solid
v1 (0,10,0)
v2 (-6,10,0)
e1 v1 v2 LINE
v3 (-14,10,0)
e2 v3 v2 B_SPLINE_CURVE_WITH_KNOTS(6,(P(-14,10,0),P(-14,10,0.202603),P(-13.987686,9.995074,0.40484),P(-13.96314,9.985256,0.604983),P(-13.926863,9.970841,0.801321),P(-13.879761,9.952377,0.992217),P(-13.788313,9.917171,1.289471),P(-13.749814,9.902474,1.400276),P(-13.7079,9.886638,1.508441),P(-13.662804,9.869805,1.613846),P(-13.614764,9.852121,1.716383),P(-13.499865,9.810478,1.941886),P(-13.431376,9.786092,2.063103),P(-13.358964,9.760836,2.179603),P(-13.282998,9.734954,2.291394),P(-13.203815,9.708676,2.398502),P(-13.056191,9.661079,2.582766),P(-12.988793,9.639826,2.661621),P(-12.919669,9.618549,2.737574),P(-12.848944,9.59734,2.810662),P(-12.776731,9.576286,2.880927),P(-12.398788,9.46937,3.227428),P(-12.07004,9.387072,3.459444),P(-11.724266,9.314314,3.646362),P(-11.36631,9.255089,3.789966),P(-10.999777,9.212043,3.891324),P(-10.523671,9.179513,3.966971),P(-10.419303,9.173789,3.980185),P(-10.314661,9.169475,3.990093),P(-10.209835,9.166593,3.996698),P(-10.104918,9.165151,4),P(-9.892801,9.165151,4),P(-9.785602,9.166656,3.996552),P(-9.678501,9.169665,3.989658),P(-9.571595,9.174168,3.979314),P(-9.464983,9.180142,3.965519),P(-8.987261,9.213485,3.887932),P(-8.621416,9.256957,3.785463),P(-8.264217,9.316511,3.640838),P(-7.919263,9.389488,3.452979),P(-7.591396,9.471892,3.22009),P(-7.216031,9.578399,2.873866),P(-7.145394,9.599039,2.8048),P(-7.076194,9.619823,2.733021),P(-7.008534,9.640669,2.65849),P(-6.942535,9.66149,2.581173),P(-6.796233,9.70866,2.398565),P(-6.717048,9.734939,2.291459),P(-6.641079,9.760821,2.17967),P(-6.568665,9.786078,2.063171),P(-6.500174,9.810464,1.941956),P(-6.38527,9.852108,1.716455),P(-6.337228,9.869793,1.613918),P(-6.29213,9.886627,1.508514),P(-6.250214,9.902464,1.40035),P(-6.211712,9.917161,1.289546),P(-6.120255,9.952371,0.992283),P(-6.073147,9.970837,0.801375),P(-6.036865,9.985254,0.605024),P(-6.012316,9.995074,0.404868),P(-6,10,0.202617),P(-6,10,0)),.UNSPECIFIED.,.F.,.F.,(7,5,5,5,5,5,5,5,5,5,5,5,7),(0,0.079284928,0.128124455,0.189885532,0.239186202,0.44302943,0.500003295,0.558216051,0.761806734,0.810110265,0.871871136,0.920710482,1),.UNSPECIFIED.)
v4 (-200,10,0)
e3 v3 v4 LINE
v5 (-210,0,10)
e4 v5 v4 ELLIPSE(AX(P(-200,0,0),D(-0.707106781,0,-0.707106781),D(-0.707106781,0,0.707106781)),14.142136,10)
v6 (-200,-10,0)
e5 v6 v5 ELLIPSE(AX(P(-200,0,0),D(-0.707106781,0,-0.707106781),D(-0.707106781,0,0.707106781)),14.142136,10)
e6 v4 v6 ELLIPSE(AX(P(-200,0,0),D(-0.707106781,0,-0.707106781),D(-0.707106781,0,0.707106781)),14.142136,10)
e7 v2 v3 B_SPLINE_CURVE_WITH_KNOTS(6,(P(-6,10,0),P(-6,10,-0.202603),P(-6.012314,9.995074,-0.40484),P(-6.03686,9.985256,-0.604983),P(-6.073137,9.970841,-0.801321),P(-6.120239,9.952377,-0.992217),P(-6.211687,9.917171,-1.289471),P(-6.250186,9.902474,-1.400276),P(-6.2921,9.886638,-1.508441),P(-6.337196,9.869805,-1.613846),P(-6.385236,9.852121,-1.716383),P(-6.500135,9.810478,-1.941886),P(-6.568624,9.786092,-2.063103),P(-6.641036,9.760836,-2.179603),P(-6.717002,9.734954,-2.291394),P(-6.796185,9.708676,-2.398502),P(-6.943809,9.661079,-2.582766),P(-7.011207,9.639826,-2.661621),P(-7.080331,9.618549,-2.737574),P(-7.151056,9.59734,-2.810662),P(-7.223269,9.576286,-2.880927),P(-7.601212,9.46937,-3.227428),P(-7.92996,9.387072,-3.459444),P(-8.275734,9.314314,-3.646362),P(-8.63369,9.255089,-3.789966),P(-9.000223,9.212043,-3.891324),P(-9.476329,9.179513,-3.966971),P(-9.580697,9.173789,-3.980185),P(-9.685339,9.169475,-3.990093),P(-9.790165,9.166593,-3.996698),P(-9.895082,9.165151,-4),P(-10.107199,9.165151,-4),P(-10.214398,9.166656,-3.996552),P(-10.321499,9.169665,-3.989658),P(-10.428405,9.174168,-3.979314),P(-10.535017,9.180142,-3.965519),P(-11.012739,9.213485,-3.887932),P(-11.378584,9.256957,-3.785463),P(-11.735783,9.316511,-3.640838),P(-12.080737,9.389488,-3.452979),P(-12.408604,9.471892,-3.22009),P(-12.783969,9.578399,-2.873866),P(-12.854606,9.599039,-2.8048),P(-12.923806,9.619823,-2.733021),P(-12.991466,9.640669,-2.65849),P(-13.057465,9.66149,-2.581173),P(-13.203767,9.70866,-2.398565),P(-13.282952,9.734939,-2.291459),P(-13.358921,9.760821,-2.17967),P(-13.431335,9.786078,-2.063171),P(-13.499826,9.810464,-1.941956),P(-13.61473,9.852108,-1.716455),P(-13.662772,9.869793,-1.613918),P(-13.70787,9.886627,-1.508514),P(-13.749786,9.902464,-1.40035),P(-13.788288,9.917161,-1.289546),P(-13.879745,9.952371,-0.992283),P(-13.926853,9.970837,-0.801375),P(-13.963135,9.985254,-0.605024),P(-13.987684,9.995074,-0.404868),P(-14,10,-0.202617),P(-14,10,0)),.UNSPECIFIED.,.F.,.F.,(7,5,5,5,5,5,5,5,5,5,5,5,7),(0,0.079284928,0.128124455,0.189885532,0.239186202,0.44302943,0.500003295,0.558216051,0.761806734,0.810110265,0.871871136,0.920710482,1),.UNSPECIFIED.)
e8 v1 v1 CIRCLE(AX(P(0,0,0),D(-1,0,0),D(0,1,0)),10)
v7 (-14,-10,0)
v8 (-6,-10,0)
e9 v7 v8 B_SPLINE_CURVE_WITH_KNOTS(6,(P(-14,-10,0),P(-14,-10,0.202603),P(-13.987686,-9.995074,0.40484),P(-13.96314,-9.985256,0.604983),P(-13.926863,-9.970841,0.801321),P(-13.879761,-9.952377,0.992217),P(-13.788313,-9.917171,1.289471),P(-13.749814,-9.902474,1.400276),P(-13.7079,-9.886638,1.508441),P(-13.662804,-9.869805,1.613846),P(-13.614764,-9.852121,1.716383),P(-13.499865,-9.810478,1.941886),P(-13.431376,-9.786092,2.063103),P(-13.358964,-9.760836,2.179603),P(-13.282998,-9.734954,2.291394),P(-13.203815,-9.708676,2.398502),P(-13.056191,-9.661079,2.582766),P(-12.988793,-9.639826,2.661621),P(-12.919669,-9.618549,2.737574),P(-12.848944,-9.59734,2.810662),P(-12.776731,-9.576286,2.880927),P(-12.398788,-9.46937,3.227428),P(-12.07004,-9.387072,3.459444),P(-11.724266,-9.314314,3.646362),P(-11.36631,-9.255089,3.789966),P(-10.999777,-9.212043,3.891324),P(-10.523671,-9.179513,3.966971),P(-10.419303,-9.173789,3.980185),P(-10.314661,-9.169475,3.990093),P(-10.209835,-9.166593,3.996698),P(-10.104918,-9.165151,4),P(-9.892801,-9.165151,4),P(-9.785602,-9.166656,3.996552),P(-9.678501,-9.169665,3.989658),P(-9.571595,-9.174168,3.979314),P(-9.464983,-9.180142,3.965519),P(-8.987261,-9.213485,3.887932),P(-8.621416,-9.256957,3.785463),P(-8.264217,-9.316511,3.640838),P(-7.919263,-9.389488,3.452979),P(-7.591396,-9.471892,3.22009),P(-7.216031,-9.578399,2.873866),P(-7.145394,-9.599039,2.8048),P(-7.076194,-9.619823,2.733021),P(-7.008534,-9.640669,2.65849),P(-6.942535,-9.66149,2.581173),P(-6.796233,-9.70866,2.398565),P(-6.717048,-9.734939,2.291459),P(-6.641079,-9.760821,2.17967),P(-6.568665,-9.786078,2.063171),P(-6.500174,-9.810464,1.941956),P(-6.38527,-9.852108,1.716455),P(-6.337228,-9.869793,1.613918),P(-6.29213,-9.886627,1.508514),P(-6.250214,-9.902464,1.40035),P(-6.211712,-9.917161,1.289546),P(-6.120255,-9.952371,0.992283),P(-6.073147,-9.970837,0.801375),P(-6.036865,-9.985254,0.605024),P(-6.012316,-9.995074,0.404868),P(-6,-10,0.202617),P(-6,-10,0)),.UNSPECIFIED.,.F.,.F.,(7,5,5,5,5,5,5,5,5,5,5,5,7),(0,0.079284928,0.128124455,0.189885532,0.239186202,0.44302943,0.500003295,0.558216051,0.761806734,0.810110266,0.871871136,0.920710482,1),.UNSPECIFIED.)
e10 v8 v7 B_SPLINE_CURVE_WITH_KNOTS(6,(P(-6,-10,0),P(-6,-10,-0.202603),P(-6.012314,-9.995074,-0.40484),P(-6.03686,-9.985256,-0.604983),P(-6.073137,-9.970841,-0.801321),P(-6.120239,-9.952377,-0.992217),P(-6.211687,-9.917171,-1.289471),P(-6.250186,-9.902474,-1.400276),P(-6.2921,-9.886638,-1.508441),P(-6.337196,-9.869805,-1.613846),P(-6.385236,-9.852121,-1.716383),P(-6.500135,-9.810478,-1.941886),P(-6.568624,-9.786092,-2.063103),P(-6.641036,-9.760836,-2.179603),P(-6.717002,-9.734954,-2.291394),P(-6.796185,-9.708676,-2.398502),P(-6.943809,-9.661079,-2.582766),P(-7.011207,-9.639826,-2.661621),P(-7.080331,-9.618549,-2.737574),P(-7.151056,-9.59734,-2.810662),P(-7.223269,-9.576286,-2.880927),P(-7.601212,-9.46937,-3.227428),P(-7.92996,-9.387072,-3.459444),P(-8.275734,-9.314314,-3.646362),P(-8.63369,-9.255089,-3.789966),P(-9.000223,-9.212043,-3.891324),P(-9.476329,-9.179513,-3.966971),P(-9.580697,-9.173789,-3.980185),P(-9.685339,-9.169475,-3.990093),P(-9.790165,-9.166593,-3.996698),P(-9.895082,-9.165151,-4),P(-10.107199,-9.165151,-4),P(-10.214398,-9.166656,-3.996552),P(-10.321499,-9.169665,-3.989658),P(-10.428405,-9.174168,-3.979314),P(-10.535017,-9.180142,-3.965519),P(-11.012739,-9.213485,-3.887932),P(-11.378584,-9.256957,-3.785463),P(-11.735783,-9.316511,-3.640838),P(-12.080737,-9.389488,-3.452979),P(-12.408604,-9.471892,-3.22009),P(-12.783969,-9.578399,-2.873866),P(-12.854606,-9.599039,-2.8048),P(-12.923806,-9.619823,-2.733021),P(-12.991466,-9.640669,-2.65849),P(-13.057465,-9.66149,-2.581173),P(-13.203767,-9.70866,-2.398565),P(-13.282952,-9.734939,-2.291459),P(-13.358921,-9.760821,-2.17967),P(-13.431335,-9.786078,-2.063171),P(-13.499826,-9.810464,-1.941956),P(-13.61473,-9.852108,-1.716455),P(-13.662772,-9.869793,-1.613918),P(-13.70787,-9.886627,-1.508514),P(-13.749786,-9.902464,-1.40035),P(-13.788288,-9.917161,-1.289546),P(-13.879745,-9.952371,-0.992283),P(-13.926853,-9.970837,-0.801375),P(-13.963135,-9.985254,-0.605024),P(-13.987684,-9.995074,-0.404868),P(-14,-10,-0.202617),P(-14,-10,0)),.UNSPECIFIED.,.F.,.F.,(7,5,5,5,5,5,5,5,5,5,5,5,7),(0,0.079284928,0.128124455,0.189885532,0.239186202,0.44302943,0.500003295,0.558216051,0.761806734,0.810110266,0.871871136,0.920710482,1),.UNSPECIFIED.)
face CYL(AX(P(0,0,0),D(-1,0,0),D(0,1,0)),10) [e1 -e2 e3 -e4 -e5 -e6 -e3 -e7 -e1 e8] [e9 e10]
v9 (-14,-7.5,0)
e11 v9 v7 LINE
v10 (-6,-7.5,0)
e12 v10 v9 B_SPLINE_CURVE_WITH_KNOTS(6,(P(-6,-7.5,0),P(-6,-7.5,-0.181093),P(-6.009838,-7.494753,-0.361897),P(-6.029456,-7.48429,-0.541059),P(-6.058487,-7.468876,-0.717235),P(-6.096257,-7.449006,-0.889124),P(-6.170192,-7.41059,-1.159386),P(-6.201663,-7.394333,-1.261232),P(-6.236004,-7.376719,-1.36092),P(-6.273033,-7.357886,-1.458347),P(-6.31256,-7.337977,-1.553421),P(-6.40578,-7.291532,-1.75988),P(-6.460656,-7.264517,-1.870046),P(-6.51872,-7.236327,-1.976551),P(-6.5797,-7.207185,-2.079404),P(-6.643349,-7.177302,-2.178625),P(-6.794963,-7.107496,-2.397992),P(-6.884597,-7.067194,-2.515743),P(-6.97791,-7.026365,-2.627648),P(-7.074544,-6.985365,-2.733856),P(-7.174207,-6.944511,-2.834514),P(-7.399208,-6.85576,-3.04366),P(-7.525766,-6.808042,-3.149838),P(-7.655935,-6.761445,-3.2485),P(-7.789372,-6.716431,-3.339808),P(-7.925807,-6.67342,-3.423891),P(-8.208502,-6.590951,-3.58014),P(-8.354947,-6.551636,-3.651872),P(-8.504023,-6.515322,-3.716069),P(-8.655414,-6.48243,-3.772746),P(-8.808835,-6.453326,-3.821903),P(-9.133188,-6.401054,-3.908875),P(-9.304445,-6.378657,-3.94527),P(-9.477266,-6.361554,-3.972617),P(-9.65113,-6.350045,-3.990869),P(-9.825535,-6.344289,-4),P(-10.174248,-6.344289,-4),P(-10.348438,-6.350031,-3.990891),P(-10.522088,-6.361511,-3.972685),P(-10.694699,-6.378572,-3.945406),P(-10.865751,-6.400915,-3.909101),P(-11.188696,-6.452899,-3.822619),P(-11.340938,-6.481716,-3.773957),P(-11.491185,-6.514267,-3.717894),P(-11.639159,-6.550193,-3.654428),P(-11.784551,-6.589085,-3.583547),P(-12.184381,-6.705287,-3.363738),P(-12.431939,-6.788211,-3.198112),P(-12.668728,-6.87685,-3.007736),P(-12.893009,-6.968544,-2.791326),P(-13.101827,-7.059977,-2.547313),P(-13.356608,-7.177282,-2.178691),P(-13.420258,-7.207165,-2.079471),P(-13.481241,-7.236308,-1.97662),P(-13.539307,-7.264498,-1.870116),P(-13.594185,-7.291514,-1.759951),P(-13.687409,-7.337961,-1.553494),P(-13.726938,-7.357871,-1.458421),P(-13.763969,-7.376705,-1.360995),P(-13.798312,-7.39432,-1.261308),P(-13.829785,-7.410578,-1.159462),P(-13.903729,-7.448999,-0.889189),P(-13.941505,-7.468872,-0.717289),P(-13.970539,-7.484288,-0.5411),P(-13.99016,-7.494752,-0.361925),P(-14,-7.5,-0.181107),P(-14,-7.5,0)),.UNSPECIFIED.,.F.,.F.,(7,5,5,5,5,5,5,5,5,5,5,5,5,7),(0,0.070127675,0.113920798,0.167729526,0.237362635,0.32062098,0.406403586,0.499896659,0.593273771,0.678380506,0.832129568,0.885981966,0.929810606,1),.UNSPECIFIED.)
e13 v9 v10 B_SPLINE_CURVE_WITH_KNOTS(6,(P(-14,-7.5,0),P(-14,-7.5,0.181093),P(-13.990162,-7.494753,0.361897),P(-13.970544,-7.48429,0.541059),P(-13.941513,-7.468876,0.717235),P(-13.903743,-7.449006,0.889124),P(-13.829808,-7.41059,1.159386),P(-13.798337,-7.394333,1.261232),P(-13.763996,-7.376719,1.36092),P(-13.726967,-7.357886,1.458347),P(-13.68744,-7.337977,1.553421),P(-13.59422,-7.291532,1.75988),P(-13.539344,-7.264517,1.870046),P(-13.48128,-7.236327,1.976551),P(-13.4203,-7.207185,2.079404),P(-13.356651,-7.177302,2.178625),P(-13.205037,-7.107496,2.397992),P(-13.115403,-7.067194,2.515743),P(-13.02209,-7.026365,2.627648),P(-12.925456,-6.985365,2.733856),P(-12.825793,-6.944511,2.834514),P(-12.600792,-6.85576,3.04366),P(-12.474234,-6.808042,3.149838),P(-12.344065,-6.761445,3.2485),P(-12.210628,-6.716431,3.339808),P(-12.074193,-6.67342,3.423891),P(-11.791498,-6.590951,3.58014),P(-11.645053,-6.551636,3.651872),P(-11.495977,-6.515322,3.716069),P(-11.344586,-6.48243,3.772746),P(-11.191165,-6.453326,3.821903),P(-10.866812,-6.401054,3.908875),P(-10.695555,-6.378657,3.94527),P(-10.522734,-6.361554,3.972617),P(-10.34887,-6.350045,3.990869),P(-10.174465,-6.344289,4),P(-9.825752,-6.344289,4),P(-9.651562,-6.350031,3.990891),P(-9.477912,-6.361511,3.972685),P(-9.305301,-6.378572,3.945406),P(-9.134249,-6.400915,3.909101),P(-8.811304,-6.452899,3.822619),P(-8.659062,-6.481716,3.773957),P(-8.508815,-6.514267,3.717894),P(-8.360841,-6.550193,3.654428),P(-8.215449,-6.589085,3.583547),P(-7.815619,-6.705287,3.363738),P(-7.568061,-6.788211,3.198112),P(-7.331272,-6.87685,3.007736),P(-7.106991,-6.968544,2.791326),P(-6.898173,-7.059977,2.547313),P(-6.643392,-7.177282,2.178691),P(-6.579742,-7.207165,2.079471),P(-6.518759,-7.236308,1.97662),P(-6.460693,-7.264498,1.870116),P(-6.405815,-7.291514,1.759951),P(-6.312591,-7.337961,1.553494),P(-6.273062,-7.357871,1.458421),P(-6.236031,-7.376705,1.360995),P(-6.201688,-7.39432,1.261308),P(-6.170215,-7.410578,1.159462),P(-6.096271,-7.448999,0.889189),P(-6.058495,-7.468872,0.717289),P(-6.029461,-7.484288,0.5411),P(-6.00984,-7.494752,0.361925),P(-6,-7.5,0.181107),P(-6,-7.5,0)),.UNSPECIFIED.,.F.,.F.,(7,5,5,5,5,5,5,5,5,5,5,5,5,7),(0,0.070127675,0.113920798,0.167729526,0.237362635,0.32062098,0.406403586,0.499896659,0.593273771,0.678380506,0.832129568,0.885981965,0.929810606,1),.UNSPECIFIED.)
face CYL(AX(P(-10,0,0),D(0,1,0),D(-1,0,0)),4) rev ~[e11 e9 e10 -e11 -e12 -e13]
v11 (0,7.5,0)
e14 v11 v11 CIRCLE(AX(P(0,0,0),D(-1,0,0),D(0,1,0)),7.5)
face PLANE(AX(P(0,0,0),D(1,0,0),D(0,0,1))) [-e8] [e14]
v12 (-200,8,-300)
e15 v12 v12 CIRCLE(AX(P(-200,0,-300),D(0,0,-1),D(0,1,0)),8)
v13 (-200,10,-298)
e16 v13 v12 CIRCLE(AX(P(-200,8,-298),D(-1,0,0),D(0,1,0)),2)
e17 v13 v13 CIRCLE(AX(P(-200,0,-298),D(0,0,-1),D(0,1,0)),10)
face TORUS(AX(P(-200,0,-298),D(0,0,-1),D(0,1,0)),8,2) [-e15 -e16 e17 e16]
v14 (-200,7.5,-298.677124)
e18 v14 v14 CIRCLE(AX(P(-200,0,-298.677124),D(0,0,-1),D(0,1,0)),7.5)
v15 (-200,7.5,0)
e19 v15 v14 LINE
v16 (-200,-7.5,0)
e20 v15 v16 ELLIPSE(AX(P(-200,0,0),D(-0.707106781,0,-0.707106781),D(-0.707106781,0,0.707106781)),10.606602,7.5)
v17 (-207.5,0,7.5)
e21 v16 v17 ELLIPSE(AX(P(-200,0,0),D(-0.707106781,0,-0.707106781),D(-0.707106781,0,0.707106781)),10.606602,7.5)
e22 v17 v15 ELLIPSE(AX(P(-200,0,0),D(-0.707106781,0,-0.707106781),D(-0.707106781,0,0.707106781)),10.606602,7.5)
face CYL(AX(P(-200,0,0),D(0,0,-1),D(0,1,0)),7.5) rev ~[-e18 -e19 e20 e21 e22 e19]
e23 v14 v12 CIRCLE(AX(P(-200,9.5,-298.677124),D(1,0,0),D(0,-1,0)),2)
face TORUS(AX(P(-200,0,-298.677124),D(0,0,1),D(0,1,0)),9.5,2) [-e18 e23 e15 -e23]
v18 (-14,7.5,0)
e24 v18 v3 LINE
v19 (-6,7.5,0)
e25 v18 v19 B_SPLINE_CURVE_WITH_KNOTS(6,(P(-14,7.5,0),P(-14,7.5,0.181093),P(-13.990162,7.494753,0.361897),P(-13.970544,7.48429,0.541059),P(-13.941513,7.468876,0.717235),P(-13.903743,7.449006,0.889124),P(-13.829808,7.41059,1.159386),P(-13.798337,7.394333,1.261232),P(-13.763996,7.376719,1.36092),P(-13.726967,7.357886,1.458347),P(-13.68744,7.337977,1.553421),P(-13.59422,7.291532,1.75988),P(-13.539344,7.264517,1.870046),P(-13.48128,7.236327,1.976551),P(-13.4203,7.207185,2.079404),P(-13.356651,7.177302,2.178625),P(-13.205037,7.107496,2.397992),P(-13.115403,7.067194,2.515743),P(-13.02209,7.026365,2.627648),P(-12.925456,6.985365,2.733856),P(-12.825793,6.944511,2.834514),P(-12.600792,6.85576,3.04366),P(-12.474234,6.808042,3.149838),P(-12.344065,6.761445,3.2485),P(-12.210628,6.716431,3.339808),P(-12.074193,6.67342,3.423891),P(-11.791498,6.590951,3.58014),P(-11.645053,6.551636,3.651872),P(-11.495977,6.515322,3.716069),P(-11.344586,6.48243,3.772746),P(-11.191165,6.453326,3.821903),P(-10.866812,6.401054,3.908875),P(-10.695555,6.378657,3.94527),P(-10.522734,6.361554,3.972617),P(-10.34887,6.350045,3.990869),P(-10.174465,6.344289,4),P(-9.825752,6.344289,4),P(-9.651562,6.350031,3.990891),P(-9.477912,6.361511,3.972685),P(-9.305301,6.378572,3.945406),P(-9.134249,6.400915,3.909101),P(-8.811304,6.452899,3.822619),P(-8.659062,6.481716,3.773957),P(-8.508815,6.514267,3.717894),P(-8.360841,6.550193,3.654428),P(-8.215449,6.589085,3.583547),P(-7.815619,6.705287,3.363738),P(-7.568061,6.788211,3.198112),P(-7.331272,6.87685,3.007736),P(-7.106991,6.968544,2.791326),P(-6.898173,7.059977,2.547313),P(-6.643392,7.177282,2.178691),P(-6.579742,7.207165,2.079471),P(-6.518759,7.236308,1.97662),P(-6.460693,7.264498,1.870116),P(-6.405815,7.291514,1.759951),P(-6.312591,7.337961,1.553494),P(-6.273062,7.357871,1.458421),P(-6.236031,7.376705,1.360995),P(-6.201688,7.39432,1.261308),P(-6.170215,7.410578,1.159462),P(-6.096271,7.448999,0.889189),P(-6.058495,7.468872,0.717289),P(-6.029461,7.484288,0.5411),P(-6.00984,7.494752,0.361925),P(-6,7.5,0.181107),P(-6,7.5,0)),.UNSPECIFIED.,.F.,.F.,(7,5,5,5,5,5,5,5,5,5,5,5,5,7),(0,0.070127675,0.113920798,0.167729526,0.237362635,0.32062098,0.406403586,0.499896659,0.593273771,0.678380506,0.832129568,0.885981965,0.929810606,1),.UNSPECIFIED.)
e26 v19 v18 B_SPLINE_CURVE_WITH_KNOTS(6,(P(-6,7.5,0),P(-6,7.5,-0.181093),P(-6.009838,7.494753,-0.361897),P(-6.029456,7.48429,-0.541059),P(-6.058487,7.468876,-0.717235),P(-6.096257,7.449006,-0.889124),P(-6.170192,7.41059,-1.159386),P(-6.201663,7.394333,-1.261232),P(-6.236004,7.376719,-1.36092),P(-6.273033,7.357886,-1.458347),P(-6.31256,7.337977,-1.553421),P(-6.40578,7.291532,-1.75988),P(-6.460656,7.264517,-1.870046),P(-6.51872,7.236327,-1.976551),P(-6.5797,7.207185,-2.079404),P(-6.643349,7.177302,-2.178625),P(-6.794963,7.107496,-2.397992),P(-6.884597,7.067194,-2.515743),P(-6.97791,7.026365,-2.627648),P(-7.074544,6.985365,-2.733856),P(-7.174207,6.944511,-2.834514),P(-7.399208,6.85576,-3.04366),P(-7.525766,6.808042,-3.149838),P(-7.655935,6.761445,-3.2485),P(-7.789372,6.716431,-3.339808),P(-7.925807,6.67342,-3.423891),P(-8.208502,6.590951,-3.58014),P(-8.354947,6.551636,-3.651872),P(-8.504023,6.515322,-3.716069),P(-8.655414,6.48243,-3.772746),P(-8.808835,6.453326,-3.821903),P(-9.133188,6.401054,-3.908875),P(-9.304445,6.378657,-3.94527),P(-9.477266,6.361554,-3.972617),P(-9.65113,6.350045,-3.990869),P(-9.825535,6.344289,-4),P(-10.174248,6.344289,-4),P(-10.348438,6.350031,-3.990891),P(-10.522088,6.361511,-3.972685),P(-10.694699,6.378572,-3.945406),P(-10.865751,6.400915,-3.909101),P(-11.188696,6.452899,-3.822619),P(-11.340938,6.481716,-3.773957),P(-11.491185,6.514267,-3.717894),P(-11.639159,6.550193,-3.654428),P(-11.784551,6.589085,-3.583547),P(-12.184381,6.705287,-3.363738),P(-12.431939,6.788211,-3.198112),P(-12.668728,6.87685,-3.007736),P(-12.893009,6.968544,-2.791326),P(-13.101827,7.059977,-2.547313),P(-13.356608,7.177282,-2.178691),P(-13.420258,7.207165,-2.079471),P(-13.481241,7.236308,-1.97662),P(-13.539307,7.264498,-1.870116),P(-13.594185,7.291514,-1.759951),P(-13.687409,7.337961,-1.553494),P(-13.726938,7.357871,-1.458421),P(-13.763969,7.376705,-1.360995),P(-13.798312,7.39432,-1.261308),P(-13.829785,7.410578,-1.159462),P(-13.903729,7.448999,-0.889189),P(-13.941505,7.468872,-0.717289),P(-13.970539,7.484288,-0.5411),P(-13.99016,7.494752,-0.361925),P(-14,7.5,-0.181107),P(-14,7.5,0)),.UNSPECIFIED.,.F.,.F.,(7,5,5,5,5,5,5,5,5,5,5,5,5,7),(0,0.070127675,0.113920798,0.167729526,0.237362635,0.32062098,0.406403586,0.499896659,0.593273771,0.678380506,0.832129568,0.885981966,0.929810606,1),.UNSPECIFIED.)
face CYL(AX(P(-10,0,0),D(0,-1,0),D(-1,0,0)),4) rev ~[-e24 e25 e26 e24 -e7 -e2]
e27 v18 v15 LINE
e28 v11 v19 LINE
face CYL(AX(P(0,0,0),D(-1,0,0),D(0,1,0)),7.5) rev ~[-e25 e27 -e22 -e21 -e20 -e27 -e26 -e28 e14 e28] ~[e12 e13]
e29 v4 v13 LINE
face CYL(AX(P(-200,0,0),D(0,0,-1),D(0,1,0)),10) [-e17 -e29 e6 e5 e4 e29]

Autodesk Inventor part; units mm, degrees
ref_plane "YZ Plane" through (0, 0, 0) normal (1, 0, 0) x (0, 1, 0)
ref_plane "XZ Plane" through (0, 0, 0) normal (0, 1, 0) x (-1, 0, 0)
ref_plane "XY Plane" through (0, 0, 0) normal (0, 0, 1) x (1, 0, 0)
sketch "Skizze12" plane through (0, 0, 0) normal (0, 1, 0) x (-1, 0, 0)
  line L0 (0, 0) -> (200, 0)
  line L1 (200, 0) -> (200, -300)
  dimension "d28" = 200
  dimension "d29" = 300
sketch "Skizze13" plane through (0, 0, 0) normal (1, 0, 0) x (0, 1, 0)
  circle A0 centre (0, 0) radius 10
  circle A1 centre (0, 0) radius 7.5
  dimension "d30" = 20
  dimension "d31" = 15
sweep "Sweeping2" add profiles "Skizze13" path "Skizze12"
sketch "Skizze14" plane through (0, 0, 0) normal (0, 1, 0) x (-1, 0, 0)
  line L0 (0, 0) -> (10, 0)
  circle A0 centre (10, 0) radius 4
  dimension "d34" = 10
  dimension "d35" = 8
extrude "Extrusion3" cut sketch "Skizze14" along normal through all both and the other way through all
fillet "Rundung1" radius 2 2 edges at (-200, -10, -300) (-200, -7.5, -300)
properties part number "Steuerhebel" material "Edelstahl"
